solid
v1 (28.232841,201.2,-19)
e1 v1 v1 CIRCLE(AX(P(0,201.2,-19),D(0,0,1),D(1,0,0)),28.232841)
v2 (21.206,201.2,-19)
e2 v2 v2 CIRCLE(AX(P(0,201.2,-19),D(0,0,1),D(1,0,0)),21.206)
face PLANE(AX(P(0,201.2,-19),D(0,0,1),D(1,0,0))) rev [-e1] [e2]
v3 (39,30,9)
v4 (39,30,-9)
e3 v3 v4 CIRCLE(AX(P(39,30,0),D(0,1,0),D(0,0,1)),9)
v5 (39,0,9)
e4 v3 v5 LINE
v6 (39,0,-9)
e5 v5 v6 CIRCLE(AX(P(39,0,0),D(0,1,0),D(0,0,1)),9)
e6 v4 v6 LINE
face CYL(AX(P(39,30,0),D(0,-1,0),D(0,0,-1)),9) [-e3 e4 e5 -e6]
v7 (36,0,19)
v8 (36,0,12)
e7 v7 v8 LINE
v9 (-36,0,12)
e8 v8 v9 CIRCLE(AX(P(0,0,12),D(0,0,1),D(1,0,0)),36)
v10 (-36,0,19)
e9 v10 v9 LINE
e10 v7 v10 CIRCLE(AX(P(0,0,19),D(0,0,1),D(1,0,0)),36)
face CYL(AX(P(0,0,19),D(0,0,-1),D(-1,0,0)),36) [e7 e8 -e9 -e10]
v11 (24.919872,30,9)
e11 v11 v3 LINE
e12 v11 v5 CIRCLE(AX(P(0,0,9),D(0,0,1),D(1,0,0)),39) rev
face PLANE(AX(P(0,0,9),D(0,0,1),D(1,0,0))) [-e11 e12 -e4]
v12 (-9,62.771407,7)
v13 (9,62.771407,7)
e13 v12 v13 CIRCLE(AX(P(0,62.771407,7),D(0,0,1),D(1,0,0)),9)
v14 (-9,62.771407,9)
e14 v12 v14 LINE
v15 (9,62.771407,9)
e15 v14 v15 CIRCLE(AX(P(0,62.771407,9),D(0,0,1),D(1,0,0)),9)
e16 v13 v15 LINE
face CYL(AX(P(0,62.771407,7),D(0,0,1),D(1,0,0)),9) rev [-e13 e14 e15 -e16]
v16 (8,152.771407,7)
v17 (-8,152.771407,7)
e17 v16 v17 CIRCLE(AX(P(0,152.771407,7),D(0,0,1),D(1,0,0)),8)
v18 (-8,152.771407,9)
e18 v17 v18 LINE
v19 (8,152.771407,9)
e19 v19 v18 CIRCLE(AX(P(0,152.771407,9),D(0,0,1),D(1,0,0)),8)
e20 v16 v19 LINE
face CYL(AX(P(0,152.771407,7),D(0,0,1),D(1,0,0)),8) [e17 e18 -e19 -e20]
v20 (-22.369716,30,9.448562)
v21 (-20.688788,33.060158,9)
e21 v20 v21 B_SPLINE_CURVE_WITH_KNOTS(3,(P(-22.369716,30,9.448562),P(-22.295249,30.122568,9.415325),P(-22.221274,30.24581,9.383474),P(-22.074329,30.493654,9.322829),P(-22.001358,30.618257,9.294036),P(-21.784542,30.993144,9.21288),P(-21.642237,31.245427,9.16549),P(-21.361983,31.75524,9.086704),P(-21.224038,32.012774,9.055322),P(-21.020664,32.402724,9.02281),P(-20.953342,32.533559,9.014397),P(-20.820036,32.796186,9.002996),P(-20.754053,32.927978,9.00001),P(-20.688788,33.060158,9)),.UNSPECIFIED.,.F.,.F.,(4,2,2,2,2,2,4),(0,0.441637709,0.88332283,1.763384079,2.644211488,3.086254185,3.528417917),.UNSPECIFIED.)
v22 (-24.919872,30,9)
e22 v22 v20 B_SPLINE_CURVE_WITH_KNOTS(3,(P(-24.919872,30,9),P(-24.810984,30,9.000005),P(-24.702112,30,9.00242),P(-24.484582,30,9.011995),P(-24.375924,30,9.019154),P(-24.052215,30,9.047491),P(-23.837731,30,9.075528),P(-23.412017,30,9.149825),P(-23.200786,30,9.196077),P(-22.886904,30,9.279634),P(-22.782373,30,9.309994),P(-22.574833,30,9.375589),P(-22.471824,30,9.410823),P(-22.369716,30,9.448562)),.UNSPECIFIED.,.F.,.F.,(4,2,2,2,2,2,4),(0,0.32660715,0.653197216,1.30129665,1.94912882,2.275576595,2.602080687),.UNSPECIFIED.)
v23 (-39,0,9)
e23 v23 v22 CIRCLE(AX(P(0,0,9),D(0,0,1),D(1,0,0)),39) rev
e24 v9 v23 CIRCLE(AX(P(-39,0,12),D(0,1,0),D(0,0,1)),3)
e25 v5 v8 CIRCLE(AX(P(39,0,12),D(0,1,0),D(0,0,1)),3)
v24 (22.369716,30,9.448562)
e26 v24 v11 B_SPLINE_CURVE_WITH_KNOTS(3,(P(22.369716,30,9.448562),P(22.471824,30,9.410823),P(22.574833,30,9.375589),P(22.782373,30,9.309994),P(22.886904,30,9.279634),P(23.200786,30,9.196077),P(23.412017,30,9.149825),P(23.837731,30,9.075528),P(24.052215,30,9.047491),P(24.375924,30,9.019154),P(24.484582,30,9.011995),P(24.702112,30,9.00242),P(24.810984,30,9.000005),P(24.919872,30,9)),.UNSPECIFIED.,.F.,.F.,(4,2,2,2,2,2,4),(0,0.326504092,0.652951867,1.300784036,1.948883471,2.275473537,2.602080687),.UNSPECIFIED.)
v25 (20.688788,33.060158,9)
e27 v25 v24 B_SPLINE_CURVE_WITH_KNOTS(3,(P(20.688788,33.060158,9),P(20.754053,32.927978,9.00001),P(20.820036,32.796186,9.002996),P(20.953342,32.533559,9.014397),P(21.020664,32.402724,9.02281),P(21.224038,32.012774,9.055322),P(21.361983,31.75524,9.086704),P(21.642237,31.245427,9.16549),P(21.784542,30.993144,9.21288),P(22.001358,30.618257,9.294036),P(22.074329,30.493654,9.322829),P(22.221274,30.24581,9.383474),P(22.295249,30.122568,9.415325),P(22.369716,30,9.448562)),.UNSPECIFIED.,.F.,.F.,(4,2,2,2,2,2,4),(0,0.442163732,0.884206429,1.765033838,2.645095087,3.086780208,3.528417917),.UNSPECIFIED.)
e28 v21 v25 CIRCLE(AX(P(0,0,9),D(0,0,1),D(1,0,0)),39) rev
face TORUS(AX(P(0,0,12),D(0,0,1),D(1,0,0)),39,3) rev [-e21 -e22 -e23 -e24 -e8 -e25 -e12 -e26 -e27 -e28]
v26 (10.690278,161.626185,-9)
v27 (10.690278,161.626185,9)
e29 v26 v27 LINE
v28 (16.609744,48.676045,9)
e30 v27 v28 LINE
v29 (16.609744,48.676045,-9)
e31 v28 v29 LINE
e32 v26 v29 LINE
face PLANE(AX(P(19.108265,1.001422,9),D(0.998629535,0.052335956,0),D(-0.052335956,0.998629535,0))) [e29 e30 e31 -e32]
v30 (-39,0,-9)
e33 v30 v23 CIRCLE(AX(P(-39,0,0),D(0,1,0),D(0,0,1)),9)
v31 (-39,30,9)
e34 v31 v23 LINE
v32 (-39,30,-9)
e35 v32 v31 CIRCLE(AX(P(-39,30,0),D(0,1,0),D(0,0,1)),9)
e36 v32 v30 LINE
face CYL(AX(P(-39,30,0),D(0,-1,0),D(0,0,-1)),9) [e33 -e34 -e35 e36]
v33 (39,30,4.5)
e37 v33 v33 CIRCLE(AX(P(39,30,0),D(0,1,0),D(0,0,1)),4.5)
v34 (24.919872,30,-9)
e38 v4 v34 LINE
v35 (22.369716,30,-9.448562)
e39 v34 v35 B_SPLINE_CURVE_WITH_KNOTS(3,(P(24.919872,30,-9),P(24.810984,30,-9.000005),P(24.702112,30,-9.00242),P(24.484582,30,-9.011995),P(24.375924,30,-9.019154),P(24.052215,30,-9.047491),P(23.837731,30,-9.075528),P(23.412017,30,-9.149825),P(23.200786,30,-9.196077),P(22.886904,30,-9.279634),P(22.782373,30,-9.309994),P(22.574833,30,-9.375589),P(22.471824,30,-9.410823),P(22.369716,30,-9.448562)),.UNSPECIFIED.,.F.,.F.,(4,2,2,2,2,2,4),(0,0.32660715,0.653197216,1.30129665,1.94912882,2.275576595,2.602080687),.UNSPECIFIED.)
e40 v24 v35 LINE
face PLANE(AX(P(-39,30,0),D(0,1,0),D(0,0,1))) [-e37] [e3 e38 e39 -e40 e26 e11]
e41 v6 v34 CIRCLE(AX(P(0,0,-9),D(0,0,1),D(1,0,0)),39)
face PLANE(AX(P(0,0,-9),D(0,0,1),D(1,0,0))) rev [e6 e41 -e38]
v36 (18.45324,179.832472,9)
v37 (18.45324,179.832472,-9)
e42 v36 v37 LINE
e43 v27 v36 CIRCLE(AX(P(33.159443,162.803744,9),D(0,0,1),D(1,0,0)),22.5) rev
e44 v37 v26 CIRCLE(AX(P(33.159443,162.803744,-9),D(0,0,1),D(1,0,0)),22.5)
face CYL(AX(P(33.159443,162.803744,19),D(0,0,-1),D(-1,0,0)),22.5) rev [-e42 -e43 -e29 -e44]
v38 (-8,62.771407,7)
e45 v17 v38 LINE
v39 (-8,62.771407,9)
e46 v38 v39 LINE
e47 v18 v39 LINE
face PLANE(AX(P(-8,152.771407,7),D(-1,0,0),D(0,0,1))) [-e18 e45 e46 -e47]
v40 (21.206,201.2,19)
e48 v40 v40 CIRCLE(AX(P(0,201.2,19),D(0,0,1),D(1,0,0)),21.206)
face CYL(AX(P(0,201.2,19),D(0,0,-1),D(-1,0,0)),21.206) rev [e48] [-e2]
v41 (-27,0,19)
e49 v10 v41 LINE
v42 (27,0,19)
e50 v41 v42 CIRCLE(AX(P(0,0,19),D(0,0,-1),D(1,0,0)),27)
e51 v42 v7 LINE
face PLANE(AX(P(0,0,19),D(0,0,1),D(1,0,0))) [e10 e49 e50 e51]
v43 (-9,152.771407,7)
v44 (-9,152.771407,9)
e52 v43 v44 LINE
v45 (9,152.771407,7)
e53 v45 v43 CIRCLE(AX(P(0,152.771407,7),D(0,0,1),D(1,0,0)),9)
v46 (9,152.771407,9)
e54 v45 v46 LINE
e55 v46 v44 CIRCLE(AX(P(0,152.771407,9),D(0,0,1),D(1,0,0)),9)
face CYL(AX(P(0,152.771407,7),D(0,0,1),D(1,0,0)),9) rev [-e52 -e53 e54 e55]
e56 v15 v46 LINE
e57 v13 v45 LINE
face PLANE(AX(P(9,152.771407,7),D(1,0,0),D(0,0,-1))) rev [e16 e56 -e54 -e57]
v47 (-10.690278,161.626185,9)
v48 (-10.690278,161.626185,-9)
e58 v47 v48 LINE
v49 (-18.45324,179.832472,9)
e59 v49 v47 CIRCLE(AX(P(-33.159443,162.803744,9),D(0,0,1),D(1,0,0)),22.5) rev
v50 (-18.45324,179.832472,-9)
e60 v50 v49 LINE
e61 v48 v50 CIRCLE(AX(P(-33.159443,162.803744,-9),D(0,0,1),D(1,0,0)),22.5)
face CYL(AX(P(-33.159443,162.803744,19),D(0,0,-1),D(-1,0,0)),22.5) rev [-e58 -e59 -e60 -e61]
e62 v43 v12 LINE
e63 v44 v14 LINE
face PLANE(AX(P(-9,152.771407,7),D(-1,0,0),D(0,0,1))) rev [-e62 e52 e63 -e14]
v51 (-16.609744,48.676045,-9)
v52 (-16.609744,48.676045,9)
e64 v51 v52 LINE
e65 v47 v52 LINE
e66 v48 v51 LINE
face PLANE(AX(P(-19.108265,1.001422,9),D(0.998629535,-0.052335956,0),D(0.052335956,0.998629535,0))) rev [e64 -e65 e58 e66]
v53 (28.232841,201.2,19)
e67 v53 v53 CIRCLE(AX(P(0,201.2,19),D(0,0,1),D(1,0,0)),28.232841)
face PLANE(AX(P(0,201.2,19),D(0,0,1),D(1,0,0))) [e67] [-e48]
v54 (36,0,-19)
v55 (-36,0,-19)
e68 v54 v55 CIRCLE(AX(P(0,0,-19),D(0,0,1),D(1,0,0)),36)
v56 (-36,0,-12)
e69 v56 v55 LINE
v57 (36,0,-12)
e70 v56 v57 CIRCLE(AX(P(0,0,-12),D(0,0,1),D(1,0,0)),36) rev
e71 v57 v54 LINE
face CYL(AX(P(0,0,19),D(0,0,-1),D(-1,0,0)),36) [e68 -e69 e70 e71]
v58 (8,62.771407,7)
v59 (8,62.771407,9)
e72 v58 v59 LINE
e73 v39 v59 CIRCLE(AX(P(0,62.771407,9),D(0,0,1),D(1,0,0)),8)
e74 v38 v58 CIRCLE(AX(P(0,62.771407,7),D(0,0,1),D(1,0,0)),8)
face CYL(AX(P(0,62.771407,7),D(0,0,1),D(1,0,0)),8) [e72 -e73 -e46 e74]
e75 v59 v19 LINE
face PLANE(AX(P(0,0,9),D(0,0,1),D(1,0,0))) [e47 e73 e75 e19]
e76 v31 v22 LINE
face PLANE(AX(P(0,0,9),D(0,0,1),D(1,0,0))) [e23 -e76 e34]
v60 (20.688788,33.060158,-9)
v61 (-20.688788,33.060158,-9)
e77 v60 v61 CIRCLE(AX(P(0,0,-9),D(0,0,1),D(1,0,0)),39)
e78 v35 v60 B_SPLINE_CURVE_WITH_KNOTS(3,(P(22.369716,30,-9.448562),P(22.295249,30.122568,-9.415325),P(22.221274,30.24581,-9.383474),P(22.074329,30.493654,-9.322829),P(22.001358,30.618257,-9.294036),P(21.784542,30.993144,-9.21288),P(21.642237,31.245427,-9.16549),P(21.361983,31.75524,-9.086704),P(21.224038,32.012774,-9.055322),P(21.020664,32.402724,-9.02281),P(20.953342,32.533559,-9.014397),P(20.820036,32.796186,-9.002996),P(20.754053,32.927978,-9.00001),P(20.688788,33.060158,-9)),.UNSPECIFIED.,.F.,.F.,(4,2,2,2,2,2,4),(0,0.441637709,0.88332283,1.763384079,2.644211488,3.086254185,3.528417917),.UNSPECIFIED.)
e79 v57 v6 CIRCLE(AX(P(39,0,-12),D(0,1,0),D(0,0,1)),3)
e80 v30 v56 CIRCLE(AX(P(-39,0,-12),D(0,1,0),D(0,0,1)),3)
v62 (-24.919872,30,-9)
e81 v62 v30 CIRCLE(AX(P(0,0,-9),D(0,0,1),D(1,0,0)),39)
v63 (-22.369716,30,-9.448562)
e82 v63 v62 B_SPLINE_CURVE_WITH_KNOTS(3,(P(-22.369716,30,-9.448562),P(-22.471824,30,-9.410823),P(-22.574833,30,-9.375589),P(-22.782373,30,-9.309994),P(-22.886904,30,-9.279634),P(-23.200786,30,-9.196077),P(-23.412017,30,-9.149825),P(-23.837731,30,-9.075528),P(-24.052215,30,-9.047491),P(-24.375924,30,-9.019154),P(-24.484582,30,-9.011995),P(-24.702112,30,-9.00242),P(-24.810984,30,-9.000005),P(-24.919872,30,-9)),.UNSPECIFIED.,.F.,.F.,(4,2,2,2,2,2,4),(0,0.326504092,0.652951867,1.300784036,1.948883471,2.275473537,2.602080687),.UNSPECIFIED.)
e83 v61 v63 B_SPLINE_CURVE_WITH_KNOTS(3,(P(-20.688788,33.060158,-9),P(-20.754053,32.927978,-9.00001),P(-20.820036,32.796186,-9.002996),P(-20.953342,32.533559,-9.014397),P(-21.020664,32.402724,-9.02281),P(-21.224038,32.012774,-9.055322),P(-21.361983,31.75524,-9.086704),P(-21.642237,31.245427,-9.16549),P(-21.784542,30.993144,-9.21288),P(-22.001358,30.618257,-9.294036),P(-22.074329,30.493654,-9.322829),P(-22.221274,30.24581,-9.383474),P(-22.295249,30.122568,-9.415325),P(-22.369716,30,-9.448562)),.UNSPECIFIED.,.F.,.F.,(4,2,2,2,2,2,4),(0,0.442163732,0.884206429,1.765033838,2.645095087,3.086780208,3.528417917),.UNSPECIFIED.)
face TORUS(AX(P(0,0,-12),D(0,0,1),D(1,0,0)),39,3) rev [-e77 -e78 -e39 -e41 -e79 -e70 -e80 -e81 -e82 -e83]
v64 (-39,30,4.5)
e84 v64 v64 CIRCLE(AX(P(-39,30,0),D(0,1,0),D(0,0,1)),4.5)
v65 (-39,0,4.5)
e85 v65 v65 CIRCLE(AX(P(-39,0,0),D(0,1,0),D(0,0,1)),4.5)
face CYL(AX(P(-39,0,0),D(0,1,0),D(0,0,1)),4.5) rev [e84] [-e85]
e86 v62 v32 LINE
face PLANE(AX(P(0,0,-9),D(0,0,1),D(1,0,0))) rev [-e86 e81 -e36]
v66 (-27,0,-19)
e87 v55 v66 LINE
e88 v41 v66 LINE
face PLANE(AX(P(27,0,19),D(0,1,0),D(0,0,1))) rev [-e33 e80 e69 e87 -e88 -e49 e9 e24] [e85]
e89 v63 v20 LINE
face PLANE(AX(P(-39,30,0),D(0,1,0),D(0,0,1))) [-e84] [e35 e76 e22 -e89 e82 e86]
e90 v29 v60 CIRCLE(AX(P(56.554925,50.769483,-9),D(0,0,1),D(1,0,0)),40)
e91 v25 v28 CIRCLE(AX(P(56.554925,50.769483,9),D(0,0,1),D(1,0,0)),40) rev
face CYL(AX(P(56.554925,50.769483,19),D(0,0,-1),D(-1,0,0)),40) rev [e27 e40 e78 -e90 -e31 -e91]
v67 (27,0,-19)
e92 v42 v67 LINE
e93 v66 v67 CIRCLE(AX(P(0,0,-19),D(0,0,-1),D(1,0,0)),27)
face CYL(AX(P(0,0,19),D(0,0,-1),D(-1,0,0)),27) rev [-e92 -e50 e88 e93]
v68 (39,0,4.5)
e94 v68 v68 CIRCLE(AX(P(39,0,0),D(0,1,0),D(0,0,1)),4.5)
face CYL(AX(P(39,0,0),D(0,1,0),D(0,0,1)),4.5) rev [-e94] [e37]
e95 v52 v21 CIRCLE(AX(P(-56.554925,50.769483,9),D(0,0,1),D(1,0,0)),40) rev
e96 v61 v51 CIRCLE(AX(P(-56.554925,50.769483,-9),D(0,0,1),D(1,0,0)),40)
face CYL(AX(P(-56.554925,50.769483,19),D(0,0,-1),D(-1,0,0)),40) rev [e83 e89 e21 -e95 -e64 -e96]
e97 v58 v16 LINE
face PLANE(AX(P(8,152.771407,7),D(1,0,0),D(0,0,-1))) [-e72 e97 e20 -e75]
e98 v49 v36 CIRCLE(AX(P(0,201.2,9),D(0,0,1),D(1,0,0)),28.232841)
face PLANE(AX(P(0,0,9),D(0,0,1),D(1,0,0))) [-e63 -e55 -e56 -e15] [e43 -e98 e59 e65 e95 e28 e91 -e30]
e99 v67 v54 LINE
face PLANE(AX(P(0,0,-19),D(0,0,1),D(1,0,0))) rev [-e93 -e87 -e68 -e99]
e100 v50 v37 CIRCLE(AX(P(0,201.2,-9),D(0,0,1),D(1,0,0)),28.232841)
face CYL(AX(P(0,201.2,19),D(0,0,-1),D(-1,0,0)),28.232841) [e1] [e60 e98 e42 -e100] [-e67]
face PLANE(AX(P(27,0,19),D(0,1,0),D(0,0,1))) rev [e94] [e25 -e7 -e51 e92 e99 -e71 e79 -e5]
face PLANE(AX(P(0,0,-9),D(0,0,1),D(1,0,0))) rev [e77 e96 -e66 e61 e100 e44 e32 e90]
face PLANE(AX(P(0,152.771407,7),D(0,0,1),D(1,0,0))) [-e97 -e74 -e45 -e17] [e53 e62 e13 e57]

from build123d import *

# Parameters (mm, degrees)
SKETCH1_R               = 28.232840849
SKETCH1_R_2             = 21.20600046
BOSS_EXTRUDE1_DEPTH     = 19
BOSS_EXTRUDE1_2_DEPTH   = 19
BOSS_EXTRUDE2_DEPTH     = 9
FILLET1_R               = 22.5
FILLET2_R               = 40
CUT_EXTRUDE_THIN1_DEPTH = 2
BOSS_EXTRUDE3_DEPTH     = 30
SKETCH5_R               = 4.5
CUT_EXTRUDE1_DEPTH      = 30
CUT_EXTRUDE2_DEPTH      = 30
FILLET3_R               = 3


with BuildPart() as part:
    # Sketch1 → Boss-Extrude1 (new, symmetric)
    with BuildSketch(Plane.XY):
        with Locations((0, 201.2)):
            Circle(SKETCH1_R)
        with Locations((0, 201.2)):
            Circle(SKETCH1_R_2, mode=Mode.SUBTRACT)
    extrude(amount=BOSS_EXTRUDE1_DEPTH, both=True)



with BuildPart() as body_2:
    # Sketch1 → Boss-Extrude1 2 (new, symmetric)
    with BuildSketch(Plane.XY):
        with BuildLine():
            Line((-36, 0), (-27, 0))
            ThreePointArc((-27, 0), (0, 27), (27, 0))
            Line((27, 0), (36, 0))
            ThreePointArc((36, 0), (0, 36), (-36, 0))
        make_face()
    extrude(amount=BOSS_EXTRUDE1_2_DEPTH, both=True)


with BuildPart() as part_1:
    add(part.part)

    add(body_2.part)  # Boss-Extrude2 merges body 2
    # Sketch2 → Boss-Extrude2 (add, symmetric)
    with BuildSketch(Plane.XY):
        with BuildLine():
            Line((-10, 174.797475454), (-17.512343456, 31.453423132))
            ThreePointArc((-17.512343456, 31.453423132), (0, 36), (17.512343456, 31.453423132))
            Line((17.512343456, 31.453423132), (10, 174.797475454))
            ThreePointArc((10, 174.797475454), (0, 172.967159151), (-10, 174.797475454))
        make_face()
    extrude(amount=BOSS_EXTRUDE2_DEPTH, both=True)

    # Fillet1
    fillet1_edges = [part_1.edges().sort_by_distance(p)[0] for p in [
        (10, 174.797475454, 0),
        (-10, 174.797475454, 0),
    ]]
    fillet(fillet1_edges, radius=FILLET1_R)

    # Fillet2
    fillet2_edges = [part_1.edges().sort_by_distance(p)[0] for p in [
        (-17.512343456, 31.453423132, 0),
        (17.512343456, 31.453423132, 0),
    ]]
    fillet(fillet2_edges, radius=FILLET2_R)

    # Sketch3 → Cut-Extrude-Thin1 (cut, symmetric)
    with BuildSketch(Plane.XY.offset(9)):
        with BuildLine():
            Line((-9, 62.771407141), (-9, 152.771407141))
            ThreePointArc((-9, 152.771407141), (0, 161.771407141), (9, 152.771407141))
            Line((9, 152.771407141), (9, 62.771407141))
            ThreePointArc((9, 62.771407141), (0, 53.771407141), (-9, 62.771407141))
        make_face()
        with BuildLine():
            Line((-8, 62.771407141), (-8, 152.771407141))
            ThreePointArc((-8, 152.771407141), (0, 160.771407141), (8, 152.771407141))
            Line((8, 152.771407141), (8, 62.771407141))
            ThreePointArc((8, 62.771407141), (0, 54.771407141), (-8, 62.771407141))
        make_face(mode=Mode.SUBTRACT)
    extrude(amount=CUT_EXTRUDE_THIN1_DEPTH, both=True, mode=Mode.SUBTRACT)

    # Sketch4 → Boss-Extrude3 (add)
    with BuildSketch(Plane(origin=(0, 0, 0), x_dir=(1, 0, 0), z_dir=(0, 1, 0))):
        with BuildLine():
            Line((-39, 9), (39, 9))
            ThreePointArc((39, 9), (48, 0), (39, -9))
            Line((39, -9), (-39, -9))
            ThreePointArc((-39, -9), (-48, 0), (-39, 9))
        make_face()
    extrude(amount=BOSS_EXTRUDE3_DEPTH)

    # Sketch5 → Cut-Extrude1 (cut)
    with BuildSketch(Plane(origin=(0, 30, 0), x_dir=(1, 0, 0), z_dir=(0, 1, 0))):
        with Locations(Location((-39, 0, 0), (0, 0, 270))):
            Circle(SKETCH5_R)
        with Locations(Location((39, 0, 0), (0, 0, 270))):
            Circle(SKETCH5_R)
    extrude(amount=-CUT_EXTRUDE1_DEPTH, mode=Mode.SUBTRACT)

    # Sketch7 → Cut-Extrude2 (cut)
    with BuildSketch(Plane.XY.offset(9)):
        with BuildLine():
            Line((-27, 0), (27, 0))
            ThreePointArc((27, 0), (0, 27), (-27, 0))
        make_face()
    extrude(amount=-CUT_EXTRUDE2_DEPTH, mode=Mode.SUBTRACT)

    # Fillet3
    # the kernel refuses this fillet: 3 mm, written as the material it adds along each edge
    with BuildSketch(Plane(origin=(0, 0, -9), x_dir=(1, 0, 0), z_dir=(0, -1, 0))) as fillet3_piece_1_section:
        with BuildLine():
            CenterArc((36 + FILLET3_R, -FILLET3_R), FILLET3_R, 90, 90)
            Line((36 + FILLET3_R, 0), (36, 0))
            Line((36, 0), (36, -FILLET3_R))
        make_face()
    fillet3_piece_1 = revolve(axis=Axis((0, 0, -9), (0, 0, 1)), revolution_arc=180, mode=Mode.PRIVATE)
    fillet3_piece_1 = split(fillet3_piece_1, bisect_by=Plane(origin=(34.368782616, 30, -9.69889031), z_dir=(0, -1, 0)), keep=Keep.TOP, mode=Mode.PRIVATE)
    add(fillet3_piece_1)
    with BuildSketch(Plane(origin=(0, 0, -9), x_dir=(1, 0, 0), z_dir=(0, -1, 0))) as fillet3_piece_2_section:
        with BuildLine():
            CenterArc((36 + FILLET3_R, -FILLET3_R), FILLET3_R, 90, 90)
            Line((36 + FILLET3_R, 0), (36, 0))
            Line((36, 0), (36, -FILLET3_R))
        make_face()
    fillet3_piece_2 = revolve(axis=Axis((0, 0, -9), (0, 0, 1)), revolution_arc=180, mode=Mode.PRIVATE)
    fillet3_piece_2 = fillet3_piece_2 - Plane(origin=(-56.554925494, 50.769482983, -9.84745497), x_dir=(0.9986295347545739, -0.05233595624294397, 0), z_dir=(0, 0, -1)) * Cylinder(40, 156, mode=Mode.PRIVATE)
    fillet3_piece_2 = fillet3_piece_2 - Plane(origin=(56.554925494, 50.769482983, -9.84745497), x_dir=(-0.9986295347545739, -0.05233595624294397, 0), z_dir=(0, 0, -1)) * Cylinder(40, 156, mode=Mode.PRIVATE)
    add(fillet3_piece_2)
    with BuildSketch(Plane(origin=(0, 0, 9), x_dir=(-1, 0, 0), z_dir=(0, -1, 0))) as fillet3_piece_3_section:
        with BuildLine():
            CenterArc((36 + FILLET3_R, -FILLET3_R), FILLET3_R, 90, 90)
            Line((36, -FILLET3_R), (36, 0))
            Line((36, 0), (36 + FILLET3_R, 0))
        make_face()
    fillet3_piece_3 = revolve(axis=Axis((0, 0, 9), (0, 0, -1)), revolution_arc=180, mode=Mode.PRIVATE)
    fillet3_piece_3 = split(fillet3_piece_3, bisect_by=Plane(origin=(-34.368785519, 30, 9.698889588), z_dir=(0, -1, 0)), keep=Keep.TOP, mode=Mode.PRIVATE)
    add(fillet3_piece_3)
    with BuildSketch(Plane(origin=(0, 0, 9), x_dir=(-1, 0, 0), z_dir=(0, -1, 0))) as fillet3_piece_4_section:
        with BuildLine():
            CenterArc((36 + FILLET3_R, -FILLET3_R), FILLET3_R, 90, 90)
            Line((36, -FILLET3_R), (36, 0))
            Line((36, 0), (36 + FILLET3_R, 0))
        make_face()
    fillet3_piece_4 = revolve(axis=Axis((0, 0, 9), (0, 0, -1)), revolution_arc=180, mode=Mode.PRIVATE)
    fillet3_piece_4 = fillet3_piece_4 - Plane(origin=(-56.554925494, 50.769482983, 10.5000003), x_dir=(0.9986295347545739, -0.05233595624294397, 0), z_dir=(0, 0, -1)) * Cylinder(40, 156, mode=Mode.PRIVATE)
    fillet3_piece_4 = fillet3_piece_4 - Plane(origin=(56.554925494, 50.769482983, 10.5000003), x_dir=(-0.9986295347545739, -0.05233595624294397, 0), z_dir=(0, 0, -1)) * Cylinder(40, 156, mode=Mode.PRIVATE)
    add(fillet3_piece_4)


solid = part_1.part
